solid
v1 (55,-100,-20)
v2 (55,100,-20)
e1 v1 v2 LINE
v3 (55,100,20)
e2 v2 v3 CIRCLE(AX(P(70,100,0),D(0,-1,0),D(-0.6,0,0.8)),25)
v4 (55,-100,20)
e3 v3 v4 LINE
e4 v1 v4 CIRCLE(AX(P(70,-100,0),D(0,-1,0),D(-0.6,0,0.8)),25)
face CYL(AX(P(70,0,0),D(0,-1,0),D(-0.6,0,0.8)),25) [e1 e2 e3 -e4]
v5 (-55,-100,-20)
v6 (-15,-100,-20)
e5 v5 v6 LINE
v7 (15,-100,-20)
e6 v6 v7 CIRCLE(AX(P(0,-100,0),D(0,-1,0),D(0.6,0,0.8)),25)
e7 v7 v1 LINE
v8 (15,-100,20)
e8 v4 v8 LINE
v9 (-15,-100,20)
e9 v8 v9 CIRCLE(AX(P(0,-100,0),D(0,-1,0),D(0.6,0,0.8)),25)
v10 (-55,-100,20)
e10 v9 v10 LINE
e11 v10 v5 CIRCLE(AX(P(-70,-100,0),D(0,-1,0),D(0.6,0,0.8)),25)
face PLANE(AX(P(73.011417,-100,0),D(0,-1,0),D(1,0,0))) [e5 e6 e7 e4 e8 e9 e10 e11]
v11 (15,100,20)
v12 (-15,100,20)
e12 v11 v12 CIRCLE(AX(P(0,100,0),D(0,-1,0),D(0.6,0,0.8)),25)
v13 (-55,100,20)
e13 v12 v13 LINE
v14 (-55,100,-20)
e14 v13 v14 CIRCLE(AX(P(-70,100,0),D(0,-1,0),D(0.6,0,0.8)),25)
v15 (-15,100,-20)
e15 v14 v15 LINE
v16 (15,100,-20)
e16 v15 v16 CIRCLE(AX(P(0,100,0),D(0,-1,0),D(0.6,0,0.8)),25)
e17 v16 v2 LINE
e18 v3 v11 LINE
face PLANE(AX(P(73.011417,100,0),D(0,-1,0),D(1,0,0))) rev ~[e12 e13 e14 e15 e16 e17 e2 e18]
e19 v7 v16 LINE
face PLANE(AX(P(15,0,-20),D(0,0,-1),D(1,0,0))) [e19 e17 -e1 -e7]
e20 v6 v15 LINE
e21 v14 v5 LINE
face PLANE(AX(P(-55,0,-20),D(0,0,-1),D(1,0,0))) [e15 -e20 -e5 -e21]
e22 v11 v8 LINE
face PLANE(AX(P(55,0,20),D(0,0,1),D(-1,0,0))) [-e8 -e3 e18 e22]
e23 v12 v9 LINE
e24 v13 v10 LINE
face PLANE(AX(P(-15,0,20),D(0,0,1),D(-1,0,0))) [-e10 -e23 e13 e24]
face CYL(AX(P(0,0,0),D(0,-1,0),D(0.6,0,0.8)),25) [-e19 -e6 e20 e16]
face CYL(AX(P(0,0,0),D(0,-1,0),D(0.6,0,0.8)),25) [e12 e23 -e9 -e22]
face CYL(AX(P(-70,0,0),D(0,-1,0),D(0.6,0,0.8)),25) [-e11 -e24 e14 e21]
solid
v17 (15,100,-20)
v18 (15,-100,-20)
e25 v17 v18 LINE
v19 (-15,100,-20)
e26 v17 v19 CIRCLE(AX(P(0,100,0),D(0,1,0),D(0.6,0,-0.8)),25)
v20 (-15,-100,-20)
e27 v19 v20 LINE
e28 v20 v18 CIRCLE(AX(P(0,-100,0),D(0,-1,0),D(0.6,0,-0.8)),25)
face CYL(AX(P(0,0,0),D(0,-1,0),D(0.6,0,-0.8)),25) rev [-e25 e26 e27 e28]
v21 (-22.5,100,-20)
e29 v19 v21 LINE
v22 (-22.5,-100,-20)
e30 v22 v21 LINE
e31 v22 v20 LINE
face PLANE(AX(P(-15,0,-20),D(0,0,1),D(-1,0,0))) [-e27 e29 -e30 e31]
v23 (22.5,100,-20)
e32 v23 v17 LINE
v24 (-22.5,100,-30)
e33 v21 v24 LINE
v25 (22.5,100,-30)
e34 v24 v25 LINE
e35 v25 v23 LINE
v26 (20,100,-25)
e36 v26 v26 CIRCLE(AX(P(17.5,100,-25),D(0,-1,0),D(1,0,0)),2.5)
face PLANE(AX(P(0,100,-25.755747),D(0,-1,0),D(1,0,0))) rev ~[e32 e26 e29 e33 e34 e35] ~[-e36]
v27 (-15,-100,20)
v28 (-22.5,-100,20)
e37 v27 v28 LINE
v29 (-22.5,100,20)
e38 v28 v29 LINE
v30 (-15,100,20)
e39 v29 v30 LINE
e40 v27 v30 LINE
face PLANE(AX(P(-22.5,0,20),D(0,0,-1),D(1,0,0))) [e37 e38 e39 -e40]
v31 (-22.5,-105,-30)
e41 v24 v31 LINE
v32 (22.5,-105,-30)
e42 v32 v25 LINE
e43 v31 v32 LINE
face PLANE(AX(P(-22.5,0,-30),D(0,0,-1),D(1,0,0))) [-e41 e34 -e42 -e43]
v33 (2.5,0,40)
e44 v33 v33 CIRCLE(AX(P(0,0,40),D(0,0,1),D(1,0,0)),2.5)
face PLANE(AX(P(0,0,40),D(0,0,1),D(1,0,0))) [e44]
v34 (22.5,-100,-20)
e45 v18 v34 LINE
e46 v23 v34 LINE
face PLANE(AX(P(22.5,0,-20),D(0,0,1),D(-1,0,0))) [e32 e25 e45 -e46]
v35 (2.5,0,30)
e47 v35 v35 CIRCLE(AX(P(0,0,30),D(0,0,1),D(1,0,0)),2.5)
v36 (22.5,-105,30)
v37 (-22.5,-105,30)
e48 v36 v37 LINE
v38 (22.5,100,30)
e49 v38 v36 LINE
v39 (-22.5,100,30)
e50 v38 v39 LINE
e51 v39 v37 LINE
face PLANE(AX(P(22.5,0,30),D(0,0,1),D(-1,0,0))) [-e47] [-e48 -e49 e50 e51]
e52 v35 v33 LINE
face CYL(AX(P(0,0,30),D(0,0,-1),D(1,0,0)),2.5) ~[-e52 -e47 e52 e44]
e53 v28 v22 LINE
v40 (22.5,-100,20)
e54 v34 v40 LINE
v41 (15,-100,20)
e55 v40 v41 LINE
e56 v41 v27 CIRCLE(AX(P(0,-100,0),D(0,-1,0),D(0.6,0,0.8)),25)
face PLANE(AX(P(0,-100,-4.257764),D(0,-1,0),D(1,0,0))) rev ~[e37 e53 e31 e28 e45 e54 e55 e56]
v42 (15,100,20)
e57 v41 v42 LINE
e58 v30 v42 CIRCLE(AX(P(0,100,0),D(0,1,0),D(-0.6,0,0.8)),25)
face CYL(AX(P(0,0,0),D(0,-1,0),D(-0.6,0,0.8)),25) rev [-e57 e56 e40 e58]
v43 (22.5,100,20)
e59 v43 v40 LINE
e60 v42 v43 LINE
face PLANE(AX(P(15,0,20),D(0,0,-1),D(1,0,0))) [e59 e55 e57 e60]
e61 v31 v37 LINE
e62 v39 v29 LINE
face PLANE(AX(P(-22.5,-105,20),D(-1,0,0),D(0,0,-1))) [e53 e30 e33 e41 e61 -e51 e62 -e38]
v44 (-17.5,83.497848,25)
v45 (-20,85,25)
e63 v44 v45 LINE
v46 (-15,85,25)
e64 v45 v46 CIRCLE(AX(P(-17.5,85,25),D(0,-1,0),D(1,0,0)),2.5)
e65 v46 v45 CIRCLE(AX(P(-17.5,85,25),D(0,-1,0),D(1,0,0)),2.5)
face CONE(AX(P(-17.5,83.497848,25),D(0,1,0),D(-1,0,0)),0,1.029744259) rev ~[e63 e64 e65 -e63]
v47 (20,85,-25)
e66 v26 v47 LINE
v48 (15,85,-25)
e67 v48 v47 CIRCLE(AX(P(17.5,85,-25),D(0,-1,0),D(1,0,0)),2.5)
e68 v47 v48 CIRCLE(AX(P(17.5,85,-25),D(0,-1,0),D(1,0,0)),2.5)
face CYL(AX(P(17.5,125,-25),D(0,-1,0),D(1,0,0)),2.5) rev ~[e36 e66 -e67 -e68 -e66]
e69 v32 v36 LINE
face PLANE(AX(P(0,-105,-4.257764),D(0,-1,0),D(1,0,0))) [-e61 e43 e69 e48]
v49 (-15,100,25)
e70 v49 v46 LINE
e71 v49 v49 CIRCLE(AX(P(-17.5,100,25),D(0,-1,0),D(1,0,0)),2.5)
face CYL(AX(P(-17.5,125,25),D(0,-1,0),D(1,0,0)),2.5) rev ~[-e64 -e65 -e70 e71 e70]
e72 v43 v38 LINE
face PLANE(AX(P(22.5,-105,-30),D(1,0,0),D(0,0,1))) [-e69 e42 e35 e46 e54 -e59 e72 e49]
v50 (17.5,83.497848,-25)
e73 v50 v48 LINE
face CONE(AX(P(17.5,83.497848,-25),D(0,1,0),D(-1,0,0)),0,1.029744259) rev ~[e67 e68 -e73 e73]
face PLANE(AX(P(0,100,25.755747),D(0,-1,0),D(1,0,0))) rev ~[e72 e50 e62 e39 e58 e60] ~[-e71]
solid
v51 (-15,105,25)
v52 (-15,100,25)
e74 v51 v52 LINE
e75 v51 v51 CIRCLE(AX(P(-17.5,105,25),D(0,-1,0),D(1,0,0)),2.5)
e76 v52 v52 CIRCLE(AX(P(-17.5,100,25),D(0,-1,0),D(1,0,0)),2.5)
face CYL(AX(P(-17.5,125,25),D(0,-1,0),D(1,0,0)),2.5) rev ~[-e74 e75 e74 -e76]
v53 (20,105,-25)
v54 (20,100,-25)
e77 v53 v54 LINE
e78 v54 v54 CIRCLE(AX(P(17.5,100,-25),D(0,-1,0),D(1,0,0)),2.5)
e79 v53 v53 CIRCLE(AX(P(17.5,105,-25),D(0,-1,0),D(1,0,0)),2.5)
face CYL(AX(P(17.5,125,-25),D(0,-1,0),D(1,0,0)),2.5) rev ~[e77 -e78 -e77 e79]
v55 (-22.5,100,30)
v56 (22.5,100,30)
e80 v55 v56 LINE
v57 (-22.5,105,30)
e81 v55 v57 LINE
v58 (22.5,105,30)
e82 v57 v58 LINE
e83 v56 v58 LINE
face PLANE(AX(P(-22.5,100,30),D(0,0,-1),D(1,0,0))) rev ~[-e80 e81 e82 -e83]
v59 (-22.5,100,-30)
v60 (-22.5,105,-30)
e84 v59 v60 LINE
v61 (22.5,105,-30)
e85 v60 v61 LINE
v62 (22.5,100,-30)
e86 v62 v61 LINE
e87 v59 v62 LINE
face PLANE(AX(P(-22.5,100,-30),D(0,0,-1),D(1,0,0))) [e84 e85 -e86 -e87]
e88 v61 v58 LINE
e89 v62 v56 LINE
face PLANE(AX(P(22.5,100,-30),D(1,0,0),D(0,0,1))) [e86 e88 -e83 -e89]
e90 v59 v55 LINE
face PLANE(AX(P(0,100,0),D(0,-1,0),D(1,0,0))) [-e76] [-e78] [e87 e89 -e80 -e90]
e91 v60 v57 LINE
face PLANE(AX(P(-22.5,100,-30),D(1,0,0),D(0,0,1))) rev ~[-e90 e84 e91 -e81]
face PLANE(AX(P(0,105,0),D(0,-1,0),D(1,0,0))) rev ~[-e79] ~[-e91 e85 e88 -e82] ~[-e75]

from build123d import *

# Parameters (mm, degrees)
F1_DEPTH   = 100
F3_DEPTH   = 105
F5_DEPTH   = 5
F6_START   = -205
F4_W       = 45
F4_H       = 60
F6_DEPTH   = 5
F7_DEPTH   = 5
F9_D       = 5
F9_DEPTH   = 20
F9_TIP     = 1.5021515476
F9_2_D     = 5
F9_2_DEPTH = 20
F9_2_TIP   = 1.5021515476
F10_R      = 2.5
F11_DEPTH  = 10


with BuildPart() as f1:
    # F0 (on Front) → F1 (new body, symmetric)
    with BuildSketch(Plane.XZ):
        with BuildLine():
            ThreePointArc((55, -20), (81.1803398875, -22.360679775), (95, 0))
            ThreePointArc((95, 0), (81.1803398875, 22.360679775), (55, 20))
            Line((55, 20), (70, 20))
            Line((70, 20), (70, -20))
            Line((70, -20), (55, -20))
        make_face()
        with BuildLine():
            Line((70, 20), (55, 20))
            ThreePointArc((55, 20), (45, 0), (55, -20))
            Line((55, -20), (70, -20))
            Line((70, -20), (70, 20))
        make_face()
        with BuildLine():
            ThreePointArc((55, -20), (45, 0), (55, 20))
            Line((55, 20), (15, 20))
            ThreePointArc((15, 20), (22.360679775, 11.1803398875), (25, 0))
            ThreePointArc((25, 0), (22.360679775, -11.1803398875), (15, -20))
            Line((15, -20), (55, -20))
        make_face()
        with BuildLine():
            Line((-15, 20), (15, 20))
            ThreePointArc((15, 20), (0, 25), (-15, 20))
        make_face()
        with BuildLine():
            ThreePointArc((25, 0), (22.360679775, 11.1803398875), (15, 20))
            Line((15, 20), (-15, 20))
            ThreePointArc((-15, 20), (-25, 0), (-15, -20))
            Line((-15, -20), (15, -20))
            ThreePointArc((15, -20), (22.360679775, -11.1803398875), (25, 0))
        make_face()
        with BuildLine():
            ThreePointArc((-15, -20), (0, -25), (15, -20))
            Line((15, -20), (-15, -20))
        make_face()
        with BuildLine():
            ThreePointArc((-15, -20), (-25, 0), (-15, 20))
            Line((-15, 20), (-55, 20))
            ThreePointArc((-55, 20), (-47.639320225, 11.1803398875), (-45, 0))
            ThreePointArc((-45, 0), (-47.639320225, -11.1803398875), (-55, -20))
            Line((-55, -20), (-15, -20))
        make_face()
        with BuildLine():
            Line((-70, 20), (-55, 20))
            ThreePointArc((-55, 20), (-95, 0), (-55, -20))
            Line((-55, -20), (-70, -20))
            Line((-70, -20), (-70, 20))
        make_face()
        with BuildLine():
            ThreePointArc((-45, 0), (-47.639320225, 11.1803398875), (-55, 20))
            Line((-55, 20), (-70, 20))
            Line((-70, 20), (-70, -20))
            Line((-70, -20), (-55, -20))
            ThreePointArc((-55, -20), (-47.639320225, -11.1803398875), (-45, 0))
        make_face()
    extrude(amount=F1_DEPTH, both=True)


with BuildPart() as f3:
    # F2 (on Front) → F3 (new body, symmetric)
    with BuildSketch(Plane.XZ):
        with BuildLine():
            Line((15, 20), (22.5, 20))
            Line((22.5, 20), (22.5, 30))
            Line((22.5, 30), (-22.5, 30))
            Line((-22.5, 30), (-22.5, 20))
            Line((-22.5, 20), (-15, 20))
            ThreePointArc((-15, 20), (0, 25), (15, 20))
        make_face()
    extrude(amount=F3_DEPTH, both=True)



with BuildPart() as f3b:
    # F2 (on Front) → F3, piece 2 (new body, symmetric)
    with BuildSketch(Plane.XZ):
        with BuildLine():
            Line((22.5, -30), (22.5, -20))
            Line((22.5, -20), (15, -20))
            ThreePointArc((15, -20), (0, -25), (-15, -20))
            Line((-15, -20), (-22.5, -20))
            Line((-22.5, -20), (-22.5, -30))
            Line((-22.5, -30), (22.5, -30))
        make_face()
    extrude(amount=F3_DEPTH, both=True)


with BuildPart() as f3_1:
    add(f3.part)

    add(f3b.part)  # F5 merges F3b
    # F4 (on face) → F5 (join)
    with BuildSketch(Plane.XZ.offset(105)):
        with BuildLine():
            Line((-15, 20), (-22.5, 20))
            Line((-22.5, 20), (-22.5, -30))
            Line((-22.5, -30), (22.5, -30))
            Line((22.5, -30), (22.5, 20))
            Line((22.5, 20), (15, 20))
            ThreePointArc((15, 20), (0, 25), (-15, 20))
        make_face()
    extrude(amount=-F5_DEPTH)

    # F7 (cut): faces of the model
    f7_faces = [f3_1.faces().sort_by_distance(p)[0] for p in [
        (0, 105, 25.8760623382),
        (0, 105, -25.8760623382),
    ]]
    extrude(f7_faces, amount=-F7_DEPTH, mode=Mode.SUBTRACT)

    # F9
    with Locations(Plane(origin=(0, 105, 0), x_dir=(-1, 0, 0), z_dir=(0, 1, 0))):
        with Locations((-17.5, -25), (17.5, 25)):
            Hole(F9_D / 2, depth=F9_DEPTH)
            with Locations((0, 0, -(F9_DEPTH + F9_TIP / 2))):  # 118° drill point
                Cone(0, F9_D / 2, F9_TIP, mode=Mode.SUBTRACT)

    # F10 (on face) → F11 (join)
    with BuildSketch(Plane.XY.offset(30)):
        Circle(F10_R)
    extrude(amount=F11_DEPTH)


with BuildPart() as f6:
    # F4 (on face) → F6 (new body)
    with BuildSketch(Plane.XZ.offset(105).offset(F6_START)):
        Rectangle(F4_W, F4_H)
    extrude(amount=-F6_DEPTH)

    # F9#2
    with Locations(Plane(origin=(0, 105, 0), x_dir=(-1, 0, 0), z_dir=(0, 1, 0))):
        with Locations((-17.5, -25), (17.5, 25)):
            Hole(F9_2_D / 2, depth=F9_2_DEPTH)
            with Locations((0, 0, -(F9_2_DEPTH + F9_2_TIP / 2))):  # 118° drill point
                Cone(0, F9_2_D / 2, F9_2_TIP, mode=Mode.SUBTRACT)


solid = Compound([f1.part, f3_1.part, f6.part])
